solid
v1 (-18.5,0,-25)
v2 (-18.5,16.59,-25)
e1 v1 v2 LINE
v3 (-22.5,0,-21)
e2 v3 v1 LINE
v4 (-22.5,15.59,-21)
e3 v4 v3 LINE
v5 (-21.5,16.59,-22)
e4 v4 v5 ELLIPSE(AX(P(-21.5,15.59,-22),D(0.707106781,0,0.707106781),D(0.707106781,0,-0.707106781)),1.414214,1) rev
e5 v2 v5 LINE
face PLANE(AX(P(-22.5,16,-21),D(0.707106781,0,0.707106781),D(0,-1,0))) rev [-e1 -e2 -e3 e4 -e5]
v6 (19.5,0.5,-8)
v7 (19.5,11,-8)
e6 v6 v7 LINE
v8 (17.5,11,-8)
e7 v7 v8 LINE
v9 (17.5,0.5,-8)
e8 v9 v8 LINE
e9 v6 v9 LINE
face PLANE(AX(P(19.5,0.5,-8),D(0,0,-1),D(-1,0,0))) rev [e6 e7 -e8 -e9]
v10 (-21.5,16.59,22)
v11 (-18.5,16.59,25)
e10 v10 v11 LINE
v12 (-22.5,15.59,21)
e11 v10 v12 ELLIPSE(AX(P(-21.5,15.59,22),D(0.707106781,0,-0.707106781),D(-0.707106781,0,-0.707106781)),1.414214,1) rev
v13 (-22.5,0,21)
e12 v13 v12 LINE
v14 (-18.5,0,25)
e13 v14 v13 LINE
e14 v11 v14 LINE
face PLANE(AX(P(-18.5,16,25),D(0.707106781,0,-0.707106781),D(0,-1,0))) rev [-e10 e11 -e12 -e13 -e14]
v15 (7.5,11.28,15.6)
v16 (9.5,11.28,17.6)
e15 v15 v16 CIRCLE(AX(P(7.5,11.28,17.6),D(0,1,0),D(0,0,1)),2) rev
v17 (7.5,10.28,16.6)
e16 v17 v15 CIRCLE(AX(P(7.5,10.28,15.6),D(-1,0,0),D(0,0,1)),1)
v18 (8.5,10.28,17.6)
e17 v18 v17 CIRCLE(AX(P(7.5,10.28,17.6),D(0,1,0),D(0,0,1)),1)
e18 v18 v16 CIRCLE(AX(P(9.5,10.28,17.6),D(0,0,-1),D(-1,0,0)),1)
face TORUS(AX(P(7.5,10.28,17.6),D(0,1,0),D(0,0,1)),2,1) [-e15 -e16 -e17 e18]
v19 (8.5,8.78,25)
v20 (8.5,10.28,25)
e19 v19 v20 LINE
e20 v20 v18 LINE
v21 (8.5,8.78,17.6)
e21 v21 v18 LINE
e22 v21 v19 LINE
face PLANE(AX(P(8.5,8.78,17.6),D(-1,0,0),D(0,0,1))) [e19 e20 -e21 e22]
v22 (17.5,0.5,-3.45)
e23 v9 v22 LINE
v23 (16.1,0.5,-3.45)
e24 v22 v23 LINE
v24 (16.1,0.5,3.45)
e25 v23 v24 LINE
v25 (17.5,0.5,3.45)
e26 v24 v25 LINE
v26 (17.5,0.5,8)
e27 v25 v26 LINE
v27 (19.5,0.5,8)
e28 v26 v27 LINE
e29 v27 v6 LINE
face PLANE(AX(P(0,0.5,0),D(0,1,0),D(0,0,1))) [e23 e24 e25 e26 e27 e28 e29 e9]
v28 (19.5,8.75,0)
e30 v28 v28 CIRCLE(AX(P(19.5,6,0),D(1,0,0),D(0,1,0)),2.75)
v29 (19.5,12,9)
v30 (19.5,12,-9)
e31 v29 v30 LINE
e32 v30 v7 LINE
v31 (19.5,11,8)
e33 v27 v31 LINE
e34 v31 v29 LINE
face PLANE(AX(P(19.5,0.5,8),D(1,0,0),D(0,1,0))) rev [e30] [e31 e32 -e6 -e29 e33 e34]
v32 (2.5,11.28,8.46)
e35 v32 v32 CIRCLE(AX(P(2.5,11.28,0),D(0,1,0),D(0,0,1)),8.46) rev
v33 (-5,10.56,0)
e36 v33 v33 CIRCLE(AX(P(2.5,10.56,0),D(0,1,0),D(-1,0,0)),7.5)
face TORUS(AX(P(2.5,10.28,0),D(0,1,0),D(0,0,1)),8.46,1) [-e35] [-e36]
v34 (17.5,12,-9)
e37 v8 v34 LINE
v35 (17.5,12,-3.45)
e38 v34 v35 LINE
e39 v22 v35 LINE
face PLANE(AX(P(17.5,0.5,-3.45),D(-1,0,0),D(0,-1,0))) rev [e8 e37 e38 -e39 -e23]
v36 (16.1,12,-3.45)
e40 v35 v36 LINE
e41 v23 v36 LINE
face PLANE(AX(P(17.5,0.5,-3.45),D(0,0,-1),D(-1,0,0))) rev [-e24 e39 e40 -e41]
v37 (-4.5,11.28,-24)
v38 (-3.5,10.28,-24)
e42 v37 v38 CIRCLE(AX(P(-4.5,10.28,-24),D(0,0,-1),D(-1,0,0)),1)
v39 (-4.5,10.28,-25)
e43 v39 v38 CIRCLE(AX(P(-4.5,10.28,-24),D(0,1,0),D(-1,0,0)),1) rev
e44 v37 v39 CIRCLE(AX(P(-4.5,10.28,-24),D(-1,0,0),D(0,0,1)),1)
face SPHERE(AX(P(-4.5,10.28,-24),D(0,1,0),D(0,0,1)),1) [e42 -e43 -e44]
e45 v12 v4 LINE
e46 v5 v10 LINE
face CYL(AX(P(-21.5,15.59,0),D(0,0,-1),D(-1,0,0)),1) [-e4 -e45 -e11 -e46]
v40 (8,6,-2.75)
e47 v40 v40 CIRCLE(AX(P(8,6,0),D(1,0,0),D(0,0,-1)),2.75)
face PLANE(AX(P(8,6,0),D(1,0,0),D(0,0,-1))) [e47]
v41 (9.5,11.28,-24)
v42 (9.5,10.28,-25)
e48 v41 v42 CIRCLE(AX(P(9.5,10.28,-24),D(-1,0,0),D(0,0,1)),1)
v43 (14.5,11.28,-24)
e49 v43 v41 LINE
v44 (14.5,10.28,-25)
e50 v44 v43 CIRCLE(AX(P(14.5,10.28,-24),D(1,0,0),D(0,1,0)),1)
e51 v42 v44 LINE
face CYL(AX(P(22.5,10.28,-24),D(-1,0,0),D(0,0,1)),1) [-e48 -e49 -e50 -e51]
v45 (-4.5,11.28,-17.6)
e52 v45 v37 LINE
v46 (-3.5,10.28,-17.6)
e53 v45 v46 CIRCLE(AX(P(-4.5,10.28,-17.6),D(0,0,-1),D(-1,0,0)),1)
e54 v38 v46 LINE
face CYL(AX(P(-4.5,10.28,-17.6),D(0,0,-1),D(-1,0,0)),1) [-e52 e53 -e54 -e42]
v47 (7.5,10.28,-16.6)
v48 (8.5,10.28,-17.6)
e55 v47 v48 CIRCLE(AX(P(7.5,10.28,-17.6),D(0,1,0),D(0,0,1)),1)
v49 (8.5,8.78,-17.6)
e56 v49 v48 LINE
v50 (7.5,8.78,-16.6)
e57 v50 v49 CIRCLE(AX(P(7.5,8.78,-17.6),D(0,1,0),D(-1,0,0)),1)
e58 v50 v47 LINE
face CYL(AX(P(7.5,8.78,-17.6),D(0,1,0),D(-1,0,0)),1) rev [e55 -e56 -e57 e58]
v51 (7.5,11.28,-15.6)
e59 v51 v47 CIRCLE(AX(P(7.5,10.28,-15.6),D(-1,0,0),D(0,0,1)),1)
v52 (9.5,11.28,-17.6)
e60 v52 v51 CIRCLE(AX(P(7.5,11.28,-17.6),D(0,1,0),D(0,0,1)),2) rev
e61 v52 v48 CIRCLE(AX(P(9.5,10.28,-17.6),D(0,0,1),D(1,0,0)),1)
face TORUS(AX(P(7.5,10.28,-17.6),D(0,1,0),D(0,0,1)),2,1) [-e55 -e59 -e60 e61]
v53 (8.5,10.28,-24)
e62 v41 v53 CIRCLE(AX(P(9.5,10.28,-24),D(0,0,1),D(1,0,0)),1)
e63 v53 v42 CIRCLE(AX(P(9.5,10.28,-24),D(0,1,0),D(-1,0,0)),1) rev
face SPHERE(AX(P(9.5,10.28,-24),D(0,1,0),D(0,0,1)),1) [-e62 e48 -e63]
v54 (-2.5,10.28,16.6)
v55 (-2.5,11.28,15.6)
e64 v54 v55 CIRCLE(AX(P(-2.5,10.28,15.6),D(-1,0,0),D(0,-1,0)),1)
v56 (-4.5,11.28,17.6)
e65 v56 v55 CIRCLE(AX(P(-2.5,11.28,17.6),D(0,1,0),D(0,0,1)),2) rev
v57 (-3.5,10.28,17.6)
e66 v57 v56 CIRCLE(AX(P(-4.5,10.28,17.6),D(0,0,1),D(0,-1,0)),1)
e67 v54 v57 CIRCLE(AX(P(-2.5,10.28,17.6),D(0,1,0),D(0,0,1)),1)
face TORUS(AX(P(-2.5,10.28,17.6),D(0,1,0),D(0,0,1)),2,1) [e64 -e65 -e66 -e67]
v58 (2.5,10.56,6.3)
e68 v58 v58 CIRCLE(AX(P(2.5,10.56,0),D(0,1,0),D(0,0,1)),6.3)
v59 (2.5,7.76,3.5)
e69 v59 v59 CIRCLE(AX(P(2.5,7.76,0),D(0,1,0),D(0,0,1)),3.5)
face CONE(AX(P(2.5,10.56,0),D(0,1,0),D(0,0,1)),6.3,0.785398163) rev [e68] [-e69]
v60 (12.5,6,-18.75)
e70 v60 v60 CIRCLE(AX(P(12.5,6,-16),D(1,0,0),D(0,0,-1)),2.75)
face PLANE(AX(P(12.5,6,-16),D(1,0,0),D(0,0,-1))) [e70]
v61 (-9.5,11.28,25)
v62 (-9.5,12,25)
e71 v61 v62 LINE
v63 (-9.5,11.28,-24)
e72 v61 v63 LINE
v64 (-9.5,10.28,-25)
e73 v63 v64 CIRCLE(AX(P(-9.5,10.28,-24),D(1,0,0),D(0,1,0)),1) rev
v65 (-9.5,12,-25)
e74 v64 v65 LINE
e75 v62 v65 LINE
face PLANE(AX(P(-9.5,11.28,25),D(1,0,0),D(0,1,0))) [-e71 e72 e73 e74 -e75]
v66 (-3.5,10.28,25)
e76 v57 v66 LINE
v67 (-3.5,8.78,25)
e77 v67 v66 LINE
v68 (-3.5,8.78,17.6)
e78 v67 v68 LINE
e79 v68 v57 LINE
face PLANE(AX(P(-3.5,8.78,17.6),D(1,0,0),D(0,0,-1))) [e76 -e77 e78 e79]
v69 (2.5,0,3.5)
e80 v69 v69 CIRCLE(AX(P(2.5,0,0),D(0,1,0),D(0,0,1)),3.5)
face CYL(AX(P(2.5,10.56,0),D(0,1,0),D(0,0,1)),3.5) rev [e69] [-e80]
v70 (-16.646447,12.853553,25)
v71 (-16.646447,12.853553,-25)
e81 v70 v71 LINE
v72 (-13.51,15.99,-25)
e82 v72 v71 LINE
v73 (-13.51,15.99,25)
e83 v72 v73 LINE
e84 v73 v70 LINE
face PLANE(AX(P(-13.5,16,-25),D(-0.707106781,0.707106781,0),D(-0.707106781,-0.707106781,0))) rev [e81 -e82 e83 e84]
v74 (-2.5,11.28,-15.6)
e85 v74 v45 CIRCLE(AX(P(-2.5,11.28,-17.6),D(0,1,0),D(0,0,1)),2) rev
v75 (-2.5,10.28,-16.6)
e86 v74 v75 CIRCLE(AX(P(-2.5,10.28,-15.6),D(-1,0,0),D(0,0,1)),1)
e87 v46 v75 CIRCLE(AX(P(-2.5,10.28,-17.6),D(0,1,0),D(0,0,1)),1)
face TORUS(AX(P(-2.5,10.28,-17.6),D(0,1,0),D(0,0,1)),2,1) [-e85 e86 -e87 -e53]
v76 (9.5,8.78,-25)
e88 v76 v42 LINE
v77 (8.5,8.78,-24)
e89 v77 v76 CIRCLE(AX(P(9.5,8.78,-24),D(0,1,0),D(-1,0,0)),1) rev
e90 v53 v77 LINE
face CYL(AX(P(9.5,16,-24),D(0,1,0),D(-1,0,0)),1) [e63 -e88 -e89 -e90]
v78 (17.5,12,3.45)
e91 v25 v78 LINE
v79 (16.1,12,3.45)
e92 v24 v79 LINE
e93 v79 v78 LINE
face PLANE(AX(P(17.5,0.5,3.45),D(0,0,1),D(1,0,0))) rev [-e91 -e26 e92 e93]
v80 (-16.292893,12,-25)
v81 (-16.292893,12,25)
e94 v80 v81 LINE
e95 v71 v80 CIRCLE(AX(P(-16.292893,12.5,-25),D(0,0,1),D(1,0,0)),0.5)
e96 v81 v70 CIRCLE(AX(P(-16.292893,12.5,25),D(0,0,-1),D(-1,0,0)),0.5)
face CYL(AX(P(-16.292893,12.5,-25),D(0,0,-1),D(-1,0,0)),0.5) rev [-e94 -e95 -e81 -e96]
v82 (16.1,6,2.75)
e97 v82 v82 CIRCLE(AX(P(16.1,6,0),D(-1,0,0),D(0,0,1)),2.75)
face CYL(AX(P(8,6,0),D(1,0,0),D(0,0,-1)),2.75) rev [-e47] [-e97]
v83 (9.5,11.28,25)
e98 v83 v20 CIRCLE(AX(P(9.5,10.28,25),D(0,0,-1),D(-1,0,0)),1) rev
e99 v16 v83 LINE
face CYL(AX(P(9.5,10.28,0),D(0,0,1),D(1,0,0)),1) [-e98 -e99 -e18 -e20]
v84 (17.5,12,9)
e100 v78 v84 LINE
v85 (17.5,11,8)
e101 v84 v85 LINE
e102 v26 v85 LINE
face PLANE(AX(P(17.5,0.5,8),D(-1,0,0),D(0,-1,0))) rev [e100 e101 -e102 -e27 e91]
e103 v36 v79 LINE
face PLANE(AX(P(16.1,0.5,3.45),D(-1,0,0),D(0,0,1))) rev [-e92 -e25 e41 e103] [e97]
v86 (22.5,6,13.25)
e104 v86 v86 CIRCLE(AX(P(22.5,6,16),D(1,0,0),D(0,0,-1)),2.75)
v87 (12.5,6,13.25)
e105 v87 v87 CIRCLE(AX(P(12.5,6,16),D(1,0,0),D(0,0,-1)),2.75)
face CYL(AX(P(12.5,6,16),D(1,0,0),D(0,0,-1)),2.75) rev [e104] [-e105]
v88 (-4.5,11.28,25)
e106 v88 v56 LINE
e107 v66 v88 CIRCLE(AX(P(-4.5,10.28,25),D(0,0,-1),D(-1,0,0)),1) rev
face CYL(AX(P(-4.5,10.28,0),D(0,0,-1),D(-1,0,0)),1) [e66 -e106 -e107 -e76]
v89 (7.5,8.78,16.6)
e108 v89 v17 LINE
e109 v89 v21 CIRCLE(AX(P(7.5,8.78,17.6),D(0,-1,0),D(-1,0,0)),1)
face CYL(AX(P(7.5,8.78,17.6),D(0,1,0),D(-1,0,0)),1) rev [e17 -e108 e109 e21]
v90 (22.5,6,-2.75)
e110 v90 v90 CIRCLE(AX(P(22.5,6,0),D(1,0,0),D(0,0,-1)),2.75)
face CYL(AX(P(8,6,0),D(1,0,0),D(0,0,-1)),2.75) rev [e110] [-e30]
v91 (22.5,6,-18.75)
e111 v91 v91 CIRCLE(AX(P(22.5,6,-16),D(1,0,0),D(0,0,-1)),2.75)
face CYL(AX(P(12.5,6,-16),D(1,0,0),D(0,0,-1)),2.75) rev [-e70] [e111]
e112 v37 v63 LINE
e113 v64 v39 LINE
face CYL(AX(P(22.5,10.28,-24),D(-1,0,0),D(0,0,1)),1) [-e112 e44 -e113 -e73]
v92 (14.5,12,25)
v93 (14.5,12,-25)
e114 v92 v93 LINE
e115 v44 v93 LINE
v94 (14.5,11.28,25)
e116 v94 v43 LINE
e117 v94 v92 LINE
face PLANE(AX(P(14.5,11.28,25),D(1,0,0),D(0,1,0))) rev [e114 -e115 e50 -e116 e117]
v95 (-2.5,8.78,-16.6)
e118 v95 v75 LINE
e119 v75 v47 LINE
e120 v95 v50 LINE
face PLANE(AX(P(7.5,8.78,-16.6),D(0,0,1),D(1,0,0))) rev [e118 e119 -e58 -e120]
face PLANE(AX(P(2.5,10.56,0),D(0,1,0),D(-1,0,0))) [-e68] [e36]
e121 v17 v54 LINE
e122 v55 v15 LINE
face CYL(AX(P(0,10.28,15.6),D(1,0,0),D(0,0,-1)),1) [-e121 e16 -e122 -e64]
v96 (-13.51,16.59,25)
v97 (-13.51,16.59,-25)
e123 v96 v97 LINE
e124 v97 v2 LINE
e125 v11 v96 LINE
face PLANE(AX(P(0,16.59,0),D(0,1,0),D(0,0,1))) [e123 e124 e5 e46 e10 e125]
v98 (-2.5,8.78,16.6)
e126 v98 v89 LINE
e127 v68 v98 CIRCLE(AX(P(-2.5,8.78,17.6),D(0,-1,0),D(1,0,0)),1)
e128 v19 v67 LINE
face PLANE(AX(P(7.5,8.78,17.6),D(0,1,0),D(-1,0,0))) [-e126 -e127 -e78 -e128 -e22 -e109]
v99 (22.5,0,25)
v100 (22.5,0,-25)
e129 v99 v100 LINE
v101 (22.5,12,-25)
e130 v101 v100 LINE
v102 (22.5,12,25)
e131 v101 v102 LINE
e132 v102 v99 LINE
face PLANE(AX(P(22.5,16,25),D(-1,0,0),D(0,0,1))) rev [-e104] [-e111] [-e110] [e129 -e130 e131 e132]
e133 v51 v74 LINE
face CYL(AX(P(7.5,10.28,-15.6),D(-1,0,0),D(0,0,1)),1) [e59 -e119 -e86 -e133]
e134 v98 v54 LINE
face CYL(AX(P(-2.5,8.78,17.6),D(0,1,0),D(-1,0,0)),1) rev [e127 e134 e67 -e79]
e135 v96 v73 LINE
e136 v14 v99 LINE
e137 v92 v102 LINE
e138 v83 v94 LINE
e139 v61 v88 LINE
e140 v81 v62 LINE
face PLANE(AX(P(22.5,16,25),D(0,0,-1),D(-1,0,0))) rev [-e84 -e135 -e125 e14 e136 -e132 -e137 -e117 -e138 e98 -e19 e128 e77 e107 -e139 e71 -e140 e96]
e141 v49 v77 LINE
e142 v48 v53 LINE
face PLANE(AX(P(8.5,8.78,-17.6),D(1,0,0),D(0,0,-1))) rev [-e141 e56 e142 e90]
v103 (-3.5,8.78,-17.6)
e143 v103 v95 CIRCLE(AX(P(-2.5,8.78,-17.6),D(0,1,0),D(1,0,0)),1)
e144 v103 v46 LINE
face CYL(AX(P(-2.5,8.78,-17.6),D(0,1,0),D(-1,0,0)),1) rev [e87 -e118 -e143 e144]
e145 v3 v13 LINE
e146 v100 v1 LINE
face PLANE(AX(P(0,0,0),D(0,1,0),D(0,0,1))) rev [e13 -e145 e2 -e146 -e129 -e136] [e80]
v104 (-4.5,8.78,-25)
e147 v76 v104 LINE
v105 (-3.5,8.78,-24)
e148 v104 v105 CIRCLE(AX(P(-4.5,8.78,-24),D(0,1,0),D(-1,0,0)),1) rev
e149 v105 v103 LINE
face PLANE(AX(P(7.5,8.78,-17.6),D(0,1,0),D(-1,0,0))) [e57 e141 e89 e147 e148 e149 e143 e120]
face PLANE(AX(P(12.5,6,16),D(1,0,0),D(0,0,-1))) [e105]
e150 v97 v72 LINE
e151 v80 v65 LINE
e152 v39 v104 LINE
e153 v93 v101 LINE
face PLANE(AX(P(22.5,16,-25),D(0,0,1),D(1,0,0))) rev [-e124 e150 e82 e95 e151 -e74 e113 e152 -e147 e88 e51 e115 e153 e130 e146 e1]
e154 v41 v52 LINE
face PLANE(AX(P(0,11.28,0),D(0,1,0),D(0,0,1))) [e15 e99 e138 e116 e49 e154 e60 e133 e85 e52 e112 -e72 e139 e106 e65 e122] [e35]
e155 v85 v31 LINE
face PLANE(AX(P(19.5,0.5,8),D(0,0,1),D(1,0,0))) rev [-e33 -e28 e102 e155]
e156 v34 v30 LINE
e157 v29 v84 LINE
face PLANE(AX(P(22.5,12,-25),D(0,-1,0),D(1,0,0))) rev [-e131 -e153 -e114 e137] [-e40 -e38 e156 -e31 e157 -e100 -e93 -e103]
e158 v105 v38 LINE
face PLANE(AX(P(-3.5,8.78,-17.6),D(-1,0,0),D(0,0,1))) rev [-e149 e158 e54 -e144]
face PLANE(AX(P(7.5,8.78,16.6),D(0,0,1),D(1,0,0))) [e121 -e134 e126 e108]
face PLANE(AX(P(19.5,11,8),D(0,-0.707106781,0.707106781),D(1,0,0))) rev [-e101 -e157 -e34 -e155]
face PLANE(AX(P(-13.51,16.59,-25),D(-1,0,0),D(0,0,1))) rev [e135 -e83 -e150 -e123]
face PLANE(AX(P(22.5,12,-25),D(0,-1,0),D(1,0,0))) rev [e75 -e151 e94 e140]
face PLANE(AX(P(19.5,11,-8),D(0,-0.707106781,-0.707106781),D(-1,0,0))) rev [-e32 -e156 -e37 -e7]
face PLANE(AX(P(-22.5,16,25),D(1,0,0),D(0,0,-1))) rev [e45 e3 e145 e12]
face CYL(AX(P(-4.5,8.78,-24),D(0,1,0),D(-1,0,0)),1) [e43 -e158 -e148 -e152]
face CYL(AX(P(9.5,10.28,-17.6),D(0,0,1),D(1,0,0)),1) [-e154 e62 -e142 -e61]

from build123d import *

# Parameters (mm, degrees)
SKETCH1_W                                       = 45
SKETCH1_H                                       = 50
BOSS_EXTRUDE1_DEPTH                             = 16
CUT_EXTRUDE1_DEPTH                              = 58.116109812
SKETCH4_W                                       = 24
SKETCH4_H                                       = 50
CUT_EXTRUDE2_DEPTH                              = 0.72
CUT_EXTRUDE3_DEPTH                              = 58.116109812
SKETCH8_R                                       = 7.5
CUT_EXTRUDE4_DEPTH                              = 0.72
CSK_FOR_M6_FLAT_HEAD_MACHINE_SCREW1_D           = 7
CSK_FOR_M6_FLAT_HEAD_MACHINE_SCREW1_CSINK_D     = 12.6
CSK_FOR_M6_FLAT_HEAD_MACHINE_SCREW1_CSINK_ANGLE = 90
CUT_EXTRUDE5_DEPTH                              = 2.5
FILLET1_R                                       = 1
FILLET2_R                                       = 1
FILLET4_R                                       = 0.5
CUT_EXTRUDE7_DEPTH                              = 11.5
SKETCH18_R                                      = 2.75
CUT_EXTRUDE8_DEPTH                              = 14.5
SKETCH19_R                                      = 2.75
CUT_EXTRUDE9_DEPTH                              = 10
SKETCH21_W                                      = 8.99
SKETCH21_H                                      = 50
BOSS_EXTRUDE2_DEPTH                             = 0.6
CHAMFER1_SIZE                                   = 4
FILLET5_R                                       = 1
CHAMFER2_SIZE                                   = 1


with BuildPart() as part:
    # Sketch1 → Boss-Extrude1 (new body)
    with BuildSketch(Plane(origin=(0, 0, 0), x_dir=(1, 0, 0), z_dir=(0, 1, 0))):
        Rectangle(SKETCH1_W, SKETCH1_H)
    extrude(amount=BOSS_EXTRUDE1_DEPTH)

    # Sketch3 → Cut-Extrude1 (cut, through all)
    with BuildSketch(Plane.XY.offset(25)):
        Polygon((-13.5, 16), (-17.5, 12), (22.5, 12), (22.5, 16), align=None)
    extrude(amount=-CUT_EXTRUDE1_DEPTH, mode=Mode.SUBTRACT)

    # Sketch4 → Cut-Extrude2 (cut)
    with BuildSketch(Plane(origin=(0, 12, 0), x_dir=(1, 0, 0), z_dir=(0, 1, 0))):
        with Locations((2.5, 0)):
            Rectangle(SKETCH4_W, SKETCH4_H)
    extrude(amount=-CUT_EXTRUDE2_DEPTH, mode=Mode.SUBTRACT)

    # Sketch5 → Cut-Extrude3 (cut, through all)
    with BuildSketch(Plane.XY.offset(25)):
        Polygon((-22.5, 16), (-13.5, 16), (-13.51, 15.99), (-22.5, 15.99), align=None)
    extrude(amount=-CUT_EXTRUDE3_DEPTH, mode=Mode.SUBTRACT)

    # Sketch8 → Cut-Extrude4 (cut)
    with BuildSketch(Plane(origin=(0, 11.28, 0), x_dir=(1, 0, 0), z_dir=(0, 1, 0))):
        with Locations(Location((2.5, 0, 0), (0, 0, 180))):
            Circle(SKETCH8_R)
    extrude(amount=-CUT_EXTRUDE4_DEPTH, mode=Mode.SUBTRACT)

    # CSK for M6 Flat Head Machine Screw1 (through all)
    with Locations(Plane(origin=(0, 10.56, 0), x_dir=(1, 0, 0), z_dir=(0, 1, 0))):
        with Locations((2.5, 0)):
            CounterSinkHole(CSK_FOR_M6_FLAT_HEAD_MACHINE_SCREW1_D / 2, CSK_FOR_M6_FLAT_HEAD_MACHINE_SCREW1_CSINK_D / 2, counter_sink_angle=CSK_FOR_M6_FLAT_HEAD_MACHINE_SCREW1_CSINK_ANGLE)

    # Sketch12 → Cut-Extrude5 (cut)
    with BuildSketch(Plane(origin=(0, 11.28, 0), x_dir=(1, 0, 0), z_dir=(0, 1, 0))):
        with BuildLine():
            Line((7.5, 16.6), (-2.5, 16.6))
            ThreePointArc((-2.5, 16.6), (-3.207106781, 16.892893219), (-3.5, 17.6))
            Line((-3.5, 17.6), (-3.5, 25))
            Line((-3.5, 25), (8.5, 25))
            Line((8.5, 25), (8.5, 17.6))
            ThreePointArc((8.5, 17.6), (8.207106781, 16.892893219), (7.5, 16.6))
        make_face()
    cut_extrude5 = extrude(amount=-CUT_EXTRUDE5_DEPTH, mode=Mode.SUBTRACT)

    # Fillet1
    fillet1_edges = [part.edges().sort_by_distance(p)[0] for p in [
        (-3.5, 10.03, -25),
        (8.5, 10.03, -25),
    ]]
    fillet(fillet1_edges, radius=FILLET1_R)

    # Mirror2: Cut-Extrude5 across plane
    add(cut_extrude5.mirror(Plane.XY), mode=Mode.SUBTRACT)

    # Fillet2
    # the kernel refuses this fillet: 1 mm, written as the material it takes off along each edge
    with BuildSketch(Plane(origin=(7.5, 11.28, 17.6), x_dir=(1, 0, 0), z_dir=(0, 0, 1))) as fillet2_piece_1:
        with BuildLine():
            CenterArc((1 + FILLET2_R, -FILLET2_R), FILLET2_R, 90, 90)
            Line((1, -FILLET2_R), (1 - FILLET2_R * 0.02, -FILLET2_R))
            Line((1 - FILLET2_R * 0.02, -FILLET2_R), (1 - FILLET2_R * 0.02, FILLET2_R * 0.02))
            Line((1 - FILLET2_R * 0.02, FILLET2_R * 0.02), (1 + FILLET2_R, FILLET2_R * 0.02))
            Line((1 + FILLET2_R, FILLET2_R * 0.02), (1 + FILLET2_R, 0))
        make_face()
    revolve(axis=Axis((7.5, 11.28, 17.6), (0, 1, 0)), revolution_arc=90, mode=Mode.SUBTRACT)
    with BuildSketch(Plane(origin=(8.5, 11.28, 27.5), x_dir=(1, 0, 0), z_dir=(0, 0, -1)), Plane(origin=(-3.5, 11.28, 17.6), x_dir=(-1, 0, 0), z_dir=(0, 0, 1))) as fillet2_piece_2:
        with BuildLine():
            CenterArc((FILLET2_R, FILLET2_R), FILLET2_R, 180, 90)
            Line((0, FILLET2_R), (-FILLET2_R * 0.02, FILLET2_R))
            Line((-FILLET2_R * 0.02, FILLET2_R), (-FILLET2_R * 0.02, -FILLET2_R * 0.02))
            Line((-FILLET2_R * 0.02, -FILLET2_R * 0.02), (FILLET2_R, -FILLET2_R * 0.02))
            Line((FILLET2_R, -FILLET2_R * 0.02), (FILLET2_R, 0))
        make_face()
    extrude(amount=9.9, mode=Mode.SUBTRACT)
    with BuildSketch(Plane(origin=(-2.5, 11.28, 17.6), x_dir=(0, 0, -1), z_dir=(1, 0, 0))) as fillet2_piece_3:
        with BuildLine():
            CenterArc((1 + FILLET2_R, -FILLET2_R), FILLET2_R, 90, 90)
            Line((1, -FILLET2_R), (1 - FILLET2_R * 0.02, -FILLET2_R))
            Line((1 - FILLET2_R * 0.02, -FILLET2_R), (1 - FILLET2_R * 0.02, FILLET2_R * 0.02))
            Line((1 - FILLET2_R * 0.02, FILLET2_R * 0.02), (1 + FILLET2_R, FILLET2_R * 0.02))
            Line((1 + FILLET2_R, FILLET2_R * 0.02), (1 + FILLET2_R, 0))
        make_face()
    revolve(axis=Axis((-2.5, 11.28, 17.6), (0, 1, 0)), revolution_arc=90, mode=Mode.SUBTRACT)
    with BuildSketch(Plane(origin=(7.5, 11.28, 16.6), x_dir=(0, 0, -1), z_dir=(-1, 0, 0))) as fillet2_piece_4:
        with BuildLine():
            CenterArc((FILLET2_R, FILLET2_R), FILLET2_R, 180, 90)
            Line((0, FILLET2_R), (-FILLET2_R * 0.02, FILLET2_R))
            Line((-FILLET2_R * 0.02, FILLET2_R), (-FILLET2_R * 0.02, -FILLET2_R * 0.02))
            Line((-FILLET2_R * 0.02, -FILLET2_R * 0.02), (FILLET2_R, -FILLET2_R * 0.02))
            Line((FILLET2_R, -FILLET2_R * 0.02), (FILLET2_R, 0))
        make_face()
    extrude(amount=10, mode=Mode.SUBTRACT)
    with BuildSketch(Plane(origin=(-4.5, 11.28, -25), x_dir=(0, 0, 1), z_dir=(-1, 0, 0)), Plane(origin=(14.5, 11.28, -25), x_dir=(0, 0, 1), z_dir=(-1, 0, 0))) as fillet2_piece_5:
        with BuildLine():
            CenterArc((FILLET2_R, -FILLET2_R), FILLET2_R, 90, 90)
            Line((0, -FILLET2_R), (-FILLET2_R * 0.02, -FILLET2_R))
            Line((-FILLET2_R * 0.02, -FILLET2_R), (-FILLET2_R * 0.02, FILLET2_R * 0.02))
            Line((-FILLET2_R * 0.02, FILLET2_R * 0.02), (FILLET2_R, FILLET2_R * 0.02))
            Line((FILLET2_R, FILLET2_R * 0.02), (FILLET2_R, 0))
        make_face()
    extrude(amount=5, mode=Mode.SUBTRACT)
    with BuildSketch(Plane(origin=(2.5, 11.28, 0), x_dir=(-1, 0, 0), z_dir=(0, 0, -1))) as fillet2_piece_6:
        with BuildLine():
            CenterArc((8.46, -1), FILLET2_R, 90, 73.739795292)
            Line((7.5, -0.72), (7.4808, -0.7144))
            ThreePointArc((7.4808, -0.7144), (7.48, -0.36), (7.48, 0))
            Line((7.48, 0), (7.5, 0.02))
            Line((7.5, 0.02), (8.46, 0.02))
            Line((8.46, 0.02), (8.46, 0))
        make_face()
    revolve(axis=Axis((2.5, 11.28, 0), (0, 1, 0)), mode=Mode.SUBTRACT)
    with BuildSketch(Plane(origin=(7.5, 11.28, -17.6), x_dir=(1, 0, 0), z_dir=(0, 0, -1))) as fillet2_piece_7:
        with BuildLine():
            CenterArc((1 + FILLET2_R, FILLET2_R), FILLET2_R, 180, 90)
            Line((1, FILLET2_R), (1 - FILLET2_R * 0.02, FILLET2_R))
            Line((1 - FILLET2_R * 0.02, FILLET2_R), (1 - FILLET2_R * 0.02, -FILLET2_R * 0.02))
            Line((1 - FILLET2_R * 0.02, -FILLET2_R * 0.02), (1 + FILLET2_R, -FILLET2_R * 0.02))
            Line((1 + FILLET2_R, -FILLET2_R * 0.02), (1 + FILLET2_R, 0))
        make_face()
    revolve(axis=Axis((7.5, 11.28, -17.6), (0, -1, 0)), revolution_arc=90, mode=Mode.SUBTRACT)
    with BuildSketch(Plane(origin=(8.5, 11.28, -24), x_dir=(1, 0, 0), z_dir=(0, 0, 1)), Plane(origin=(-3.5, 11.28, -17.6), x_dir=(-1, 0, 0), z_dir=(0, 0, -1))) as fillet2_piece_8:
        with BuildLine():
            CenterArc((FILLET2_R, -FILLET2_R), FILLET2_R, 90, 90)
            Line((0, -FILLET2_R), (-FILLET2_R * 0.02, -FILLET2_R))
            Line((-FILLET2_R * 0.02, -FILLET2_R), (-FILLET2_R * 0.02, FILLET2_R * 0.02))
            Line((-FILLET2_R * 0.02, FILLET2_R * 0.02), (FILLET2_R, FILLET2_R * 0.02))
            Line((FILLET2_R, FILLET2_R * 0.02), (FILLET2_R, 0))
        make_face()
    extrude(amount=6.4, mode=Mode.SUBTRACT)
    with BuildSketch(Plane(origin=(-2.5, 11.28, -17.6), x_dir=(0, 0, 1), z_dir=(1, 0, 0))) as fillet2_piece_9:
        with BuildLine():
            CenterArc((1 + FILLET2_R, FILLET2_R), FILLET2_R, 180, 90)
            Line((1, FILLET2_R), (1 - FILLET2_R * 0.02, FILLET2_R))
            Line((1 - FILLET2_R * 0.02, FILLET2_R), (1 - FILLET2_R * 0.02, -FILLET2_R * 0.02))
            Line((1 - FILLET2_R * 0.02, -FILLET2_R * 0.02), (1 + FILLET2_R, -FILLET2_R * 0.02))
            Line((1 + FILLET2_R, -FILLET2_R * 0.02), (1 + FILLET2_R, 0))
        make_face()
    revolve(axis=Axis((-2.5, 11.28, -17.6), (0, -1, 0)), revolution_arc=90, mode=Mode.SUBTRACT)
    with BuildSketch(Plane(origin=(7.5, 11.28, -16.6), x_dir=(0, 0, 1), z_dir=(-1, 0, 0))) as fillet2_piece_10:
        with BuildLine():
            CenterArc((FILLET2_R, -FILLET2_R), FILLET2_R, 90, 90)
            Line((0, -FILLET2_R), (-FILLET2_R * 0.02, -FILLET2_R))
            Line((-FILLET2_R * 0.02, -FILLET2_R), (-FILLET2_R * 0.02, FILLET2_R * 0.02))
            Line((-FILLET2_R * 0.02, FILLET2_R * 0.02), (FILLET2_R, FILLET2_R * 0.02))
            Line((FILLET2_R, FILLET2_R * 0.02), (FILLET2_R, 0))
        make_face()
    extrude(amount=10, mode=Mode.SUBTRACT)
    with BuildSketch(Plane(origin=(-4.5, 11.28, -24), x_dir=(0, 0, -1), z_dir=(-1, 0, 0))) as fillet2_piece_11:
        with BuildLine():
            CenterArc((1 - FILLET2_R, FILLET2_R), FILLET2_R, 270, 90)
            Line((1, FILLET2_R), (1 + FILLET2_R * 0.02, FILLET2_R))
            Line((1 + FILLET2_R * 0.02, FILLET2_R), (1 + FILLET2_R * 0.02, 0))
            Line((1 + FILLET2_R * 0.02, 0), (1, -FILLET2_R * 0.02))
            Line((1, -FILLET2_R * 0.02), (1 - FILLET2_R, -FILLET2_R * 0.02))
            Line((1 - FILLET2_R, -FILLET2_R * 0.02), (1 - FILLET2_R, 0))
        make_face()
    revolve(axis=Axis((-4.5, 11.28, -24), (0, -1, 0)), revolution_arc=90, mode=Mode.SUBTRACT)
    with BuildSketch(Plane(origin=(9.5, 11.28, -24), x_dir=(0, 0, -1), z_dir=(1, 0, 0))) as fillet2_piece_12:
        with BuildLine():
            CenterArc((1 - FILLET2_R, -FILLET2_R), FILLET2_R, 0, 90)
            Line((1, -FILLET2_R), (1 + FILLET2_R * 0.02, -FILLET2_R))
            Line((1 + FILLET2_R * 0.02, -FILLET2_R), (1 + FILLET2_R * 0.02, 0))
            Line((1 + FILLET2_R * 0.02, 0), (1, FILLET2_R * 0.02))
            Line((1, FILLET2_R * 0.02), (1 - FILLET2_R, FILLET2_R * 0.02))
            Line((1 - FILLET2_R, FILLET2_R * 0.02), (1 - FILLET2_R, 0))
        make_face()
    revolve(axis=Axis((9.5, 11.28, -24), (0, 1, 0)), revolution_arc=90, mode=Mode.SUBTRACT)

    # Fillet4
    fillet4_edges = [part.edges().sort_by_distance(p)[0] for p in [
        (-17.5, 12, 0),
    ]]
    fillet(fillet4_edges, radius=FILLET4_R)

    # Sketch14 → Cut-Extrude7 (cut)
    with BuildSketch(Plane(origin=(0, 12, 0), x_dir=(1, 0, 0), z_dir=(0, 1, 0))):
        Polygon((19.5, -8), (17.5, -8), (17.5, -3.45), (16.1, -3.45), (16.1, 3.45), (17.5, 3.45), (17.5, 8), (19.5, 8), align=None)
    extrude(amount=-CUT_EXTRUDE7_DEPTH, mode=Mode.SUBTRACT)

    # Sketch18 → Cut-Extrude8 (cut)
    with BuildSketch(Plane(origin=(22.5, 0, 0), x_dir=(0, 0, -1), z_dir=(1, 0, 0))):
        with Locations((0, 6)):
            Circle(SKETCH18_R)
    extrude(amount=-CUT_EXTRUDE8_DEPTH, mode=Mode.SUBTRACT)

    # Sketch19 → Cut-Extrude9 (cut)
    with BuildSketch(Plane(origin=(22.5, 0, 0), x_dir=(0, 0, -1), z_dir=(1, 0, 0))):
        with Locations((-16, 6)):
            Circle(SKETCH19_R)
        with Locations((16, 6)):
            Circle(SKETCH19_R)
    extrude(amount=-CUT_EXTRUDE9_DEPTH, mode=Mode.SUBTRACT)

    # Sketch21 → Boss-Extrude2 (add)
    with BuildSketch(Plane(origin=(0, 15.99, 0), x_dir=(1, 0, 0), z_dir=(0, 1, 0))):
        with Locations((-18.005, 0)):
            Rectangle(SKETCH21_W, SKETCH21_H)
    extrude(amount=BOSS_EXTRUDE2_DEPTH)

    # Chamfer1
    chamfer1_edges = [part.edges().sort_by_distance(p)[0] for p in [
        (-22.5, 8.295, 25),
        (-22.5, 8.295, -25),
    ]]
    chamfer(chamfer1_edges, length=CHAMFER1_SIZE)

    # Fillet5
    fillet5_edges = [part.edges().sort_by_distance(p)[0] for p in [
        (-22.5, 16.59, 0),
    ]]
    fillet(fillet5_edges, radius=FILLET5_R)

    # Chamfer2
    chamfer2_edges = [part.edges().sort_by_distance(p)[0] for p in [
        (18.5, 12, 8),
        (18.5, 12, -8),
    ]]
    chamfer(chamfer2_edges, length=CHAMFER2_SIZE)


solid = part.part
